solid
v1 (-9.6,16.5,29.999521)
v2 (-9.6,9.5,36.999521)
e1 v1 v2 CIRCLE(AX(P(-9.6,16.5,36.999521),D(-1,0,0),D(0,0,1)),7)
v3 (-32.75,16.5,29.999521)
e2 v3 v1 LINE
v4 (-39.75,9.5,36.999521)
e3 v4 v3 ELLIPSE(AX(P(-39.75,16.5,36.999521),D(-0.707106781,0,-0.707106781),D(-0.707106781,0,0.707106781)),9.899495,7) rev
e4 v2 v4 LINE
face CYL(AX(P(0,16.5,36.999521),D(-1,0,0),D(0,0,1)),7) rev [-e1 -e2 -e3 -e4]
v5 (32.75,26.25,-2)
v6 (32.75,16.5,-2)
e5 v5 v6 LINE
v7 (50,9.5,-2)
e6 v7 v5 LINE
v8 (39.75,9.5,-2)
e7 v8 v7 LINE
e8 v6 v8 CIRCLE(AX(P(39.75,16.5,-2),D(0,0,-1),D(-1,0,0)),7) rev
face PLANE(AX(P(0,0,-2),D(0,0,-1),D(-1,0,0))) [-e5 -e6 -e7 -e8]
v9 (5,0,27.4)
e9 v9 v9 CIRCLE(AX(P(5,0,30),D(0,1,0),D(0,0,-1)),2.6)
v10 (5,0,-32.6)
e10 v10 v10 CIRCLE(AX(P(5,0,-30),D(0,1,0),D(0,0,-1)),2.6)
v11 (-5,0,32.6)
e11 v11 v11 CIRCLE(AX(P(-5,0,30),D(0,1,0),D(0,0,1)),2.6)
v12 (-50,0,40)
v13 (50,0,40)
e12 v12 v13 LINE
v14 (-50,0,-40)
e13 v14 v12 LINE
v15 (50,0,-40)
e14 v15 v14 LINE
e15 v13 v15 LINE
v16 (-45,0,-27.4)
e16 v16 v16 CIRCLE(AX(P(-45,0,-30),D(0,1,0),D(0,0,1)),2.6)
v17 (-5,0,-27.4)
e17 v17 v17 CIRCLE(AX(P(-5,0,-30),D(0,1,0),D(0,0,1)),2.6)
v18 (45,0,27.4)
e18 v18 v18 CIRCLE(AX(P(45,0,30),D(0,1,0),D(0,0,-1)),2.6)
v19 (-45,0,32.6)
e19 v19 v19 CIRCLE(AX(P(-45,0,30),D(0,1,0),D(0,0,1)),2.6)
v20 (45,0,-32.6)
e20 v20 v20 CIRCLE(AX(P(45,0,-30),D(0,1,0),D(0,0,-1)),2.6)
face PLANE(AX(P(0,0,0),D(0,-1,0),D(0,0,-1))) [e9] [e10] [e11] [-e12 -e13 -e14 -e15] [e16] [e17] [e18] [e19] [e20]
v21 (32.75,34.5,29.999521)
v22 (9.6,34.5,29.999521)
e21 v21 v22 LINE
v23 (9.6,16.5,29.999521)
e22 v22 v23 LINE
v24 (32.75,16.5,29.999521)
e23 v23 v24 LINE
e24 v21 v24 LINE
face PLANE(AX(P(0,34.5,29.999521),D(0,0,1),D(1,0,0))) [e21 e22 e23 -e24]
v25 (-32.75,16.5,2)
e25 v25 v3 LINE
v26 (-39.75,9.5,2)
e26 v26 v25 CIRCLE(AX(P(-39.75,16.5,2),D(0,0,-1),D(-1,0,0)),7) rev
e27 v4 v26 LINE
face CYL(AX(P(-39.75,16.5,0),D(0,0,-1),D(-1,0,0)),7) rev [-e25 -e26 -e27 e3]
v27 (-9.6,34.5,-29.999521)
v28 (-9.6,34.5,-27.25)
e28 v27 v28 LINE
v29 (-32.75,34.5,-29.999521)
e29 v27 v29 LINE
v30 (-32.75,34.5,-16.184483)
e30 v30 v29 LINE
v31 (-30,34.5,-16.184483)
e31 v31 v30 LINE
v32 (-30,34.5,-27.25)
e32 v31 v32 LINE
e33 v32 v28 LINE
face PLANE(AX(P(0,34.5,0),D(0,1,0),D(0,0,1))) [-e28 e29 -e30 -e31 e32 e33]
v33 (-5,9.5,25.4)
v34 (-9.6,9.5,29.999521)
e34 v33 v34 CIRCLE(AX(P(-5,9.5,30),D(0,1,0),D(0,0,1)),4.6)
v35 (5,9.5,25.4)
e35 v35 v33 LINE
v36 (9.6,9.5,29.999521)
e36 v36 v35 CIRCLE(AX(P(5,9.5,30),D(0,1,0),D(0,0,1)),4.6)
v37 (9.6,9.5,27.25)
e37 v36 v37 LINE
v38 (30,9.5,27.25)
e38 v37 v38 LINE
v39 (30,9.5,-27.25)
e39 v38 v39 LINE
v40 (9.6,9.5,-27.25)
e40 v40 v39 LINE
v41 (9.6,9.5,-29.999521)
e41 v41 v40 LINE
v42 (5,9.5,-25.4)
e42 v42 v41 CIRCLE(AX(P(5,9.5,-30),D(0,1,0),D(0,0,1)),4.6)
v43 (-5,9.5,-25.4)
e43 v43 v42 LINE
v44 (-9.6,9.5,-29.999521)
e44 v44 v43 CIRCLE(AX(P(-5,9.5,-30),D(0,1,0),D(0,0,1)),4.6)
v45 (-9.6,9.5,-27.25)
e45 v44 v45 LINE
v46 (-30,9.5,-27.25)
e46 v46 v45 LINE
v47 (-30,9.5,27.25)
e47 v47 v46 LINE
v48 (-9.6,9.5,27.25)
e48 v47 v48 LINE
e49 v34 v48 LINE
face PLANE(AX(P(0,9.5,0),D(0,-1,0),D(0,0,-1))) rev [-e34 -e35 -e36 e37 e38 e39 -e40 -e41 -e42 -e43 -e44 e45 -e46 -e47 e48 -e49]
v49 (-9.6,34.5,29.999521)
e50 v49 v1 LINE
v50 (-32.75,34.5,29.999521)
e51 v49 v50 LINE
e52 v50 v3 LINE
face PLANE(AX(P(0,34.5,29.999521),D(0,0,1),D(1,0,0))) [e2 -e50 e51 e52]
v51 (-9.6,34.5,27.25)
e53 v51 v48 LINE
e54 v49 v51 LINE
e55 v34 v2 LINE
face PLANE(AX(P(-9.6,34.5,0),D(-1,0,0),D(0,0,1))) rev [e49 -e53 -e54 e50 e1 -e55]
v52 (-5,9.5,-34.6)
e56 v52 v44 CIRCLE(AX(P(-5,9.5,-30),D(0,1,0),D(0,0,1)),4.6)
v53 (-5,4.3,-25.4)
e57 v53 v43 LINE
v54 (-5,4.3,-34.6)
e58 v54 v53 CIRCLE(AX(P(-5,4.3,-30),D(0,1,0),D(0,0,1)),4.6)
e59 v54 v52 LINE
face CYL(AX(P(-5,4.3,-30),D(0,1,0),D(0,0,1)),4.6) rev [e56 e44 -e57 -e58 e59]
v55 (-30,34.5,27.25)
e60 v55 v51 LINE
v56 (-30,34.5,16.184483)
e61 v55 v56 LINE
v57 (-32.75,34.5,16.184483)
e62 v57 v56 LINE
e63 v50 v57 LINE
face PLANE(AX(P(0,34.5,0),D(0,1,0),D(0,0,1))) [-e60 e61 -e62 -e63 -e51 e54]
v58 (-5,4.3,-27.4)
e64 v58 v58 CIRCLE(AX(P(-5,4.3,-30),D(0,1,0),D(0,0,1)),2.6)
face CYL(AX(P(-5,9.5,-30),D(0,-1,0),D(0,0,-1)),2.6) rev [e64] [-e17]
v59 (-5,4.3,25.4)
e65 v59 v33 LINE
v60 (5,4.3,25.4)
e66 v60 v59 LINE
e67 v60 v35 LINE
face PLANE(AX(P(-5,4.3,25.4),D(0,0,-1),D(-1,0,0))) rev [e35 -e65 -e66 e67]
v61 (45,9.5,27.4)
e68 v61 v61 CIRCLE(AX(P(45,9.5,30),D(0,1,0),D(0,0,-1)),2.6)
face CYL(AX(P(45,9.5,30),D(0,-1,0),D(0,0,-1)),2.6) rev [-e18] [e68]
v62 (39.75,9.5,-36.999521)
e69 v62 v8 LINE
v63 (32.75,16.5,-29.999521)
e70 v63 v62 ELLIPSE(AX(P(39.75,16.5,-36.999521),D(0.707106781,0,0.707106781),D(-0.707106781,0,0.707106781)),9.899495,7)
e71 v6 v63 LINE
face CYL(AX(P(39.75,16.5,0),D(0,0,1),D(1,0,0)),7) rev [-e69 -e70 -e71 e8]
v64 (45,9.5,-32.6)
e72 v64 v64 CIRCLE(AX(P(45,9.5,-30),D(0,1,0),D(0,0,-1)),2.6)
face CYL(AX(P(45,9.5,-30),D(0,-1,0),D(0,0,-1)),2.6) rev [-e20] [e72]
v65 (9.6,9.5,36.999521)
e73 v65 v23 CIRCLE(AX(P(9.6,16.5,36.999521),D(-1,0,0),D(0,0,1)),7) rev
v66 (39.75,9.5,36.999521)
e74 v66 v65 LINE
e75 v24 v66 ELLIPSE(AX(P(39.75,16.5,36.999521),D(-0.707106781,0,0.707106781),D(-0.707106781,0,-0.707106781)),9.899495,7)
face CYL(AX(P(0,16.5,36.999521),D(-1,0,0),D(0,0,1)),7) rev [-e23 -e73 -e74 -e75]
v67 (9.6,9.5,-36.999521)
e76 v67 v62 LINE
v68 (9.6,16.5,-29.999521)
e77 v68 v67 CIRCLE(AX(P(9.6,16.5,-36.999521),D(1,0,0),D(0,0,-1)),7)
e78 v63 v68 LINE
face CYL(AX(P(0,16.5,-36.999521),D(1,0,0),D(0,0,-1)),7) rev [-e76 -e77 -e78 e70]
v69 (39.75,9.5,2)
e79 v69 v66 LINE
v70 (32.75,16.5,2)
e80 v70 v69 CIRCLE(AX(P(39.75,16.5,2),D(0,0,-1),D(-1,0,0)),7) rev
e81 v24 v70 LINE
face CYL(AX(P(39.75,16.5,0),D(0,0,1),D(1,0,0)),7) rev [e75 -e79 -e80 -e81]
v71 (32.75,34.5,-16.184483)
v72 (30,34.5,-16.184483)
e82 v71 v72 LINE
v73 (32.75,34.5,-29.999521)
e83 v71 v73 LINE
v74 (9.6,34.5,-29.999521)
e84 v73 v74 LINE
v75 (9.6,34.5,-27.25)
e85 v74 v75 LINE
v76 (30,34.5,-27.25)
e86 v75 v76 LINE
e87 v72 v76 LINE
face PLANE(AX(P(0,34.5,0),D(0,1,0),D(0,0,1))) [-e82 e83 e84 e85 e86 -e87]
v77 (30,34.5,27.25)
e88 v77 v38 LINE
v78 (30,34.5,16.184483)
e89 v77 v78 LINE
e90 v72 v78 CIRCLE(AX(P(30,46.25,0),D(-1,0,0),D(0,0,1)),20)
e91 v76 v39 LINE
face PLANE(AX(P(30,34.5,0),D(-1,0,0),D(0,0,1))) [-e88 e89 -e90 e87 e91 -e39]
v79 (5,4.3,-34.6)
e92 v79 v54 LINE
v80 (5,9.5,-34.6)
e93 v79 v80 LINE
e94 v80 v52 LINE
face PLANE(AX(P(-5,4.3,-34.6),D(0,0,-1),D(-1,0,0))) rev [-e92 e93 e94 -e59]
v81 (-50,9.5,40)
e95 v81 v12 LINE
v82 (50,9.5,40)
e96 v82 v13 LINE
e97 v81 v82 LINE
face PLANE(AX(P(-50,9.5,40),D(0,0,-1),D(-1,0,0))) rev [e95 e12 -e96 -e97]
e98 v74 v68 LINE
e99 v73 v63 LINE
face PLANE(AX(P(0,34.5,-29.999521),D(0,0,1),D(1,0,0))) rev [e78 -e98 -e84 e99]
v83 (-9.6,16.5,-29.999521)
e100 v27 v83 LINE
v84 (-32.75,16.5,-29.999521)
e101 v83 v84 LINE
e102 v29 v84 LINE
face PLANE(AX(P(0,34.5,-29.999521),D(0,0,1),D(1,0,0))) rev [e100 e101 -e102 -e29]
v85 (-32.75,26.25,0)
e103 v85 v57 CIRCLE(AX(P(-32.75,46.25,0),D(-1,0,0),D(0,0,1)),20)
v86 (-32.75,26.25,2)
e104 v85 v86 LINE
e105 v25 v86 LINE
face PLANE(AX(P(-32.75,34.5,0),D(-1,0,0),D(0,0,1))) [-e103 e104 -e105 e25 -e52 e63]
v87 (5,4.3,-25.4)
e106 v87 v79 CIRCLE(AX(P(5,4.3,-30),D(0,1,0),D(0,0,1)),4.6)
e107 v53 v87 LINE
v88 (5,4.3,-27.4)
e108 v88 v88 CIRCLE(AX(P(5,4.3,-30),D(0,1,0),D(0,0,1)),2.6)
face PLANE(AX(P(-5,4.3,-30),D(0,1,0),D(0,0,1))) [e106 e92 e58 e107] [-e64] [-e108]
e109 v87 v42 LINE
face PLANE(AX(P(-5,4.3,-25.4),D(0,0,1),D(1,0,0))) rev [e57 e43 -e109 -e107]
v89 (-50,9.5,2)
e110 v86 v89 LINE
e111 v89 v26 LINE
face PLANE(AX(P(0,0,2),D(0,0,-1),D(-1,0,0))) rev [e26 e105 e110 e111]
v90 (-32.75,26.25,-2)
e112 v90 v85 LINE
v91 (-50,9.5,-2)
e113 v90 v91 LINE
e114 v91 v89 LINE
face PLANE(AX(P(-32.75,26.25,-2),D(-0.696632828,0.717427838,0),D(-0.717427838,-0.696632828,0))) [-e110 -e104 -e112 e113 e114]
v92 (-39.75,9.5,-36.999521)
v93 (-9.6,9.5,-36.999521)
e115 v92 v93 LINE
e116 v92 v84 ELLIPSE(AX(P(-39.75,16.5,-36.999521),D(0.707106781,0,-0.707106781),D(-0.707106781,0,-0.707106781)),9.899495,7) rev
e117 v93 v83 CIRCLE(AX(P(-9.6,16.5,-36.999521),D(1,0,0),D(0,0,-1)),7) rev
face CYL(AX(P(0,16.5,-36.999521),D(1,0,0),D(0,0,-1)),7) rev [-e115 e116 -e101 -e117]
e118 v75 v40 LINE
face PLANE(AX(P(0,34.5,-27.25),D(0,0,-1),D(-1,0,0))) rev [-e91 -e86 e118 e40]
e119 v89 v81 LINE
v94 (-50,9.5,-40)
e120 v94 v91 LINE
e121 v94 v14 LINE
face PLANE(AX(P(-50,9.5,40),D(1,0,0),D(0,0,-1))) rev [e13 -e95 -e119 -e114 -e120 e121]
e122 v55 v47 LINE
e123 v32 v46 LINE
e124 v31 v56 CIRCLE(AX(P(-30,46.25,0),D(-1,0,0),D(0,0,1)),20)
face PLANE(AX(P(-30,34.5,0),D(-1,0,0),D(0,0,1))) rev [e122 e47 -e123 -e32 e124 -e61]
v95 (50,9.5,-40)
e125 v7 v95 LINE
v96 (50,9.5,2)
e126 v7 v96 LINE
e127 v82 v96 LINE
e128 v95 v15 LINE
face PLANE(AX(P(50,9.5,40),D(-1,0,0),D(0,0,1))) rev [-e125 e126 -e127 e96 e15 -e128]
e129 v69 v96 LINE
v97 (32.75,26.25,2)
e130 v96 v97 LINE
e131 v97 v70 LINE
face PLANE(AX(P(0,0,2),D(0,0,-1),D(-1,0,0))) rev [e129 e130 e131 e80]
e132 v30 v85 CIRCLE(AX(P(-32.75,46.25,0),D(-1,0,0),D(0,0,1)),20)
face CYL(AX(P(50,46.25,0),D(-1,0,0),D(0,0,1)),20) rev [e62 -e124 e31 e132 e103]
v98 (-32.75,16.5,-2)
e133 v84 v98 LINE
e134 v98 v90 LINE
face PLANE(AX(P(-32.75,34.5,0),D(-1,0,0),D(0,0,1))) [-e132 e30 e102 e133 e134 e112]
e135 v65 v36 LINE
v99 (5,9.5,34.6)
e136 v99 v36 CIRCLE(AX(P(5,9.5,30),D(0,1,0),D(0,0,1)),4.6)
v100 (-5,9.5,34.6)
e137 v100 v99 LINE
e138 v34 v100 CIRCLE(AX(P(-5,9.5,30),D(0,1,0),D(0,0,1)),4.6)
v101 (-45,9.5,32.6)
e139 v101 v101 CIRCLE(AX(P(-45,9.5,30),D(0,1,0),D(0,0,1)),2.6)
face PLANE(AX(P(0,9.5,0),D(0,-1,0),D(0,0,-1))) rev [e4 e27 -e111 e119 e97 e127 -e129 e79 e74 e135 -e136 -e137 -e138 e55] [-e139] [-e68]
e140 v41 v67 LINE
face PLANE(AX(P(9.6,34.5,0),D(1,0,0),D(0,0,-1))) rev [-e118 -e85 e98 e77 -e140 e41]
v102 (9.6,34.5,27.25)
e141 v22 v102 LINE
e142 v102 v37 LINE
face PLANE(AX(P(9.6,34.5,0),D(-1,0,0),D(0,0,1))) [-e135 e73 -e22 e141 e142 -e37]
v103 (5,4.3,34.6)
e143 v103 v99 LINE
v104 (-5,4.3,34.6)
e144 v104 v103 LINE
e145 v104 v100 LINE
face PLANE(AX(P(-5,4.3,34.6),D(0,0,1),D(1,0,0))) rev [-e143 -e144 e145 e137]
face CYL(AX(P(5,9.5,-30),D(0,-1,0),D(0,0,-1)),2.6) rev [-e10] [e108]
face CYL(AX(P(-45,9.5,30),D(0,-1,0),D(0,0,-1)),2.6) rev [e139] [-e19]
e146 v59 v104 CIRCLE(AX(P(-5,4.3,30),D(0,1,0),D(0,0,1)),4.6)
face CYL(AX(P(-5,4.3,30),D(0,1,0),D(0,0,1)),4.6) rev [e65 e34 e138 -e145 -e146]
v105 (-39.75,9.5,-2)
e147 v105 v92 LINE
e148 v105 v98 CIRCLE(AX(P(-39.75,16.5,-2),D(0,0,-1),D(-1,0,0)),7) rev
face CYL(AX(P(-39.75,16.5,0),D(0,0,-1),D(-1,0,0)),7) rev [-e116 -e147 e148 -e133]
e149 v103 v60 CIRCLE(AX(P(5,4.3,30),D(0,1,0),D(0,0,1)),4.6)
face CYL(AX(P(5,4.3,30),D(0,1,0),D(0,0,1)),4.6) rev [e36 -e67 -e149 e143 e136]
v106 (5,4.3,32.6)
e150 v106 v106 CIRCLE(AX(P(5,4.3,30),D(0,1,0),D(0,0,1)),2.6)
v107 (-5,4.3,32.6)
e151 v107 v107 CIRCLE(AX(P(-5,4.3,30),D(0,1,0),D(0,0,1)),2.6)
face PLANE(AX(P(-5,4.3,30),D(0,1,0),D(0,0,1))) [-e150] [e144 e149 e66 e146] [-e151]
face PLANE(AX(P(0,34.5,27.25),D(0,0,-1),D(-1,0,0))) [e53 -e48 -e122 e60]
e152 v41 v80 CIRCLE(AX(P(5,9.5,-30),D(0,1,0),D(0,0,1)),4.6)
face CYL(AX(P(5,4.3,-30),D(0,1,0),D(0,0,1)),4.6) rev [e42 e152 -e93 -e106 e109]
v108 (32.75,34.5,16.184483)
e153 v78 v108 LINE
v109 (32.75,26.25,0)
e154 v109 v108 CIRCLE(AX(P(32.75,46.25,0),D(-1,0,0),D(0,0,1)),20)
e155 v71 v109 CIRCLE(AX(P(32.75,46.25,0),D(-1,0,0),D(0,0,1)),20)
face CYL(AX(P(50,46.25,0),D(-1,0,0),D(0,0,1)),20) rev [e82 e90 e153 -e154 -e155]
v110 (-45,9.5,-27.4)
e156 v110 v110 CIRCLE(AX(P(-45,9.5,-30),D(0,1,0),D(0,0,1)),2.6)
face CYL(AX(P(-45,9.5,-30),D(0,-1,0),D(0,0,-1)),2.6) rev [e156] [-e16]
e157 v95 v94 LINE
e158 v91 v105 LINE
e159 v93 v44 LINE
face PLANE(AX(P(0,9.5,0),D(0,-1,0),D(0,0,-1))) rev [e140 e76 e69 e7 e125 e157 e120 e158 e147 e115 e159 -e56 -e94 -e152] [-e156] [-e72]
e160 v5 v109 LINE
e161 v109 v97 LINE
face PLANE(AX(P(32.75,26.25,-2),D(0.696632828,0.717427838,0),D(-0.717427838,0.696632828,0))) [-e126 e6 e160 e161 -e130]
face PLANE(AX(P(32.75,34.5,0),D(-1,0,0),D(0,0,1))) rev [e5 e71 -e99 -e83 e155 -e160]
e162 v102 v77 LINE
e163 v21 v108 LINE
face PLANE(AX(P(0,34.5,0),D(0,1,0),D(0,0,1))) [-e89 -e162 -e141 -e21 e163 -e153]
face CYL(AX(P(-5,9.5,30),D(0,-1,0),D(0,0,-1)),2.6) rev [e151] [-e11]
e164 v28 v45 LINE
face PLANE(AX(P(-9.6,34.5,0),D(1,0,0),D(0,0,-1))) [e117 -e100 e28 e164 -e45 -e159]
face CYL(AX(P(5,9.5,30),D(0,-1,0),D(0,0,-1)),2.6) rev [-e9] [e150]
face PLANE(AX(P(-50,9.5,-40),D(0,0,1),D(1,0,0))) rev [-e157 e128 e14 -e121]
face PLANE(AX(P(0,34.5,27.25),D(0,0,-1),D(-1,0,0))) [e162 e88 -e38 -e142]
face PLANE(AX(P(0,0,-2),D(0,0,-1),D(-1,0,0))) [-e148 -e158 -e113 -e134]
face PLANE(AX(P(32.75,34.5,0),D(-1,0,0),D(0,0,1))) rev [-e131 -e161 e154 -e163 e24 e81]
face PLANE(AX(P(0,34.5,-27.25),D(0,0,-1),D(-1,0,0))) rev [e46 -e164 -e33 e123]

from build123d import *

# Parameters (mm, degrees)
SKETCH_1_W           = 100
SKETCH_1_H           = 80
SKETCH_1_R           = 2.6
EXTRUDE_1_DEPTH      = 9.5
CUT_EXTRUDE_1_DEPTH  = 5.2
EXTRUDE_2_DEPTH      = 25
FILLET_1_R           = 7
SKETCH_7_R           = 20
CUT_EXTRUDE_2_DEPTH  = 99.172361182
EXTRUDE_3_DEPTH      = 2
EXTRUDE_3_DEPTH_BACK = 2


with BuildPart() as part:
    # 草图1 → 凸台-拉伸1 (new body)
    with BuildSketch(Plane(origin=(0, 0, 0), x_dir=(1, 0, 0), z_dir=(0, 1, 0))):
        Rectangle(SKETCH_1_W, SKETCH_1_H)
        with Locations(Location((-45, 30, 0), (0, 0, 270))):
            Circle(SKETCH_1_R, mode=Mode.SUBTRACT)
        with Locations(Location((-5, 30, 0), (0, 0, 270))):
            Circle(SKETCH_1_R, mode=Mode.SUBTRACT)
        with Locations(Location((-5, -30, 0), (0, 0, 270))):
            Circle(SKETCH_1_R, mode=Mode.SUBTRACT)
        with Locations(Location((-45, -30, 0), (0, 0, 270))):
            Circle(SKETCH_1_R, mode=Mode.SUBTRACT)
        with Locations(Location((45, -30, 0), (0, 0, 90))):
            Circle(SKETCH_1_R, mode=Mode.SUBTRACT)
        with Locations(Location((5, -30, 0), (0, 0, 90))):
            Circle(SKETCH_1_R, mode=Mode.SUBTRACT)
        with Locations(Location((5, 30, 0), (0, 0, 90))):
            Circle(SKETCH_1_R, mode=Mode.SUBTRACT)
        with Locations(Location((45, 30, 0), (0, 0, 90))):
            Circle(SKETCH_1_R, mode=Mode.SUBTRACT)
    extrude(amount=EXTRUDE_1_DEPTH)

    # 草图4 → 切除-拉伸1 (cut)
    with BuildSketch(Plane(origin=(0, 9.5, 0), x_dir=(1, 0, 0), z_dir=(0, 1, 0))):
        with BuildLine():
            Line((-5, 34.6), (5, 34.6))
            ThreePointArc((5, 34.6), (9.6, 30), (5, 25.4))
            Line((5, 25.4), (-5, 25.4))
            ThreePointArc((-5, 25.4), (-9.6, 30), (-5, 34.6))
        make_face()
        with BuildLine():
            Line((-5, -25.4), (5, -25.4))
            ThreePointArc((5, -25.4), (9.6, -30), (5, -34.6))
            Line((5, -34.6), (-5, -34.6))
            ThreePointArc((-5, -34.6), (-9.6, -30), (-5, -25.4))
        make_face()
    extrude(amount=-CUT_EXTRUDE_1_DEPTH, mode=Mode.SUBTRACT)

    # 草图5 → 凸台-拉伸2 (add)
    with BuildSketch(Plane(origin=(0, 9.5, 0), x_dir=(1, 0, 0), z_dir=(0, 1, 0))):
        Polygon((-9.6, 27.25), (-9.6, 29.999521433), (-32.75, 29.999521433), (-32.75, -29.999521433), (-9.6, -29.999521433), (-9.6, -27.25), (-30, -27.25), (-30, 27.25), align=None)
        Polygon((32.75, 29.999521433), (9.6, 29.999521433), (9.6, 27.25), (30, 27.25), (30, -27.25), (9.6, -27.25), (9.6, -29.999521433), (32.75, -29.999521433), align=None)
    extrude(amount=EXTRUDE_2_DEPTH)

    # 圆角1
    # the kernel refuses this fillet: 7 mm, written as the material it adds along each edge
    with BuildSketch(Plane(origin=(32.75, 9.5, 29.999521433), x_dir=(1, 0, 0), z_dir=(0, 0, -1)), Plane(origin=(-32.75, 9.5, -29.999521433), x_dir=(-1, 0, 0), z_dir=(0, 0, 1))) as fillet_1_piece_1:
        with BuildLine():
            CenterArc((FILLET_1_R, -FILLET_1_R), FILLET_1_R, 90, 90)
            Line((0, -FILLET_1_R), (-FILLET_1_R * 0.02, -FILLET_1_R))
            Line((-FILLET_1_R * 0.02, -FILLET_1_R), (-FILLET_1_R * 0.02, FILLET_1_R * 0.02))
            Line((-FILLET_1_R * 0.02, FILLET_1_R * 0.02), (FILLET_1_R, FILLET_1_R * 0.02))
            Line((FILLET_1_R, FILLET_1_R * 0.02), (FILLET_1_R, 0))
        make_face()
    extrude(amount=59.999042867)
    with BuildSketch(Plane(origin=(32.75, 9.5, -29.999521433), x_dir=(0, 0, -1), z_dir=(-1, 0, 0)), Plane(origin=(9.6, 9.5, 29.999521433), x_dir=(0, 0, 1), z_dir=(1, 0, 0)), Plane(origin=(-9.6, 9.5, -29.999521433), x_dir=(0, 0, -1), z_dir=(-1, 0, 0)), Plane(origin=(-32.75, 9.5, 29.999521433), x_dir=(0, 0, 1), z_dir=(1, 0, 0))) as fillet_1_piece_2:
        with BuildLine():
            CenterArc((FILLET_1_R, -FILLET_1_R), FILLET_1_R, 90, 90)
            Line((0, -FILLET_1_R), (-FILLET_1_R * 0.02, -FILLET_1_R))
            Line((-FILLET_1_R * 0.02, -FILLET_1_R), (-FILLET_1_R * 0.02, FILLET_1_R * 0.02))
            Line((-FILLET_1_R * 0.02, FILLET_1_R * 0.02), (FILLET_1_R, FILLET_1_R * 0.02))
            Line((FILLET_1_R, FILLET_1_R * 0.02), (FILLET_1_R, 0))
        make_face()
    extrude(amount=23.15)
    with BuildSketch(Plane(origin=(9.6, 9.5, 29.999521433), x_dir=(0, 0, 1), z_dir=(1, 0, 0))) as fillet_1_piece_3a_section:
        with BuildLine():
            CenterArc((FILLET_1_R, -FILLET_1_R), FILLET_1_R, 90, 90)
            Line((0, -FILLET_1_R), (-FILLET_1_R * 0.02, -FILLET_1_R))
            Line((-FILLET_1_R * 0.02, -FILLET_1_R), (-FILLET_1_R * 0.02, FILLET_1_R * 0.02))
            Line((-FILLET_1_R * 0.02, FILLET_1_R * 0.02), (FILLET_1_R, FILLET_1_R * 0.02))
            Line((FILLET_1_R, FILLET_1_R * 0.02), (FILLET_1_R, 0))
        make_face()
    fillet_1_piece_3a = extrude(amount=40.65, mode=Mode.PRIVATE)
    fillet_1_piece_3a = split(fillet_1_piece_3a, bisect_by=Plane(origin=(32.75, 11.0847658, 31.584287233), z_dir=(1, 0, 0)), keep=Keep.TOP, mode=Mode.PRIVATE)
    with BuildSketch(Plane(origin=(32.75, 9.5, 47.499521433), x_dir=(1, 0, 0), z_dir=(0, 0, -1))) as fillet_1_piece_3b_section:
        with BuildLine():
            CenterArc((FILLET_1_R, -FILLET_1_R), FILLET_1_R, 90, 90)
            Line((0, -FILLET_1_R), (-FILLET_1_R * 0.02, -FILLET_1_R))
            Line((-FILLET_1_R * 0.02, -FILLET_1_R), (-FILLET_1_R * 0.02, FILLET_1_R * 0.02))
            Line((-FILLET_1_R * 0.02, FILLET_1_R * 0.02), (FILLET_1_R, FILLET_1_R * 0.02))
            Line((FILLET_1_R, FILLET_1_R * 0.02), (FILLET_1_R, 0))
        make_face()
    fillet_1_piece_3b = extrude(amount=77.499042867, mode=Mode.PRIVATE)
    fillet_1_piece_3b = split(fillet_1_piece_3b, bisect_by=Plane(origin=(34.3347658, 11.0847658, 29.999521433), z_dir=(0, 0, 1)), keep=Keep.TOP, mode=Mode.PRIVATE)
    fillet_1_piece_3 = fillet_1_piece_3a & fillet_1_piece_3b
    add(fillet_1_piece_3)
    with BuildSketch(Plane(origin=(32.75, 9.5, 29.999521433), x_dir=(1, 0, 0), z_dir=(0, 0, -1))) as fillet_1_piece_4a_section:
        with BuildLine():
            CenterArc((FILLET_1_R, -FILLET_1_R), FILLET_1_R, 90, 90)
            Line((0, -FILLET_1_R), (-FILLET_1_R * 0.02, -FILLET_1_R))
            Line((-FILLET_1_R * 0.02, -FILLET_1_R), (-FILLET_1_R * 0.02, FILLET_1_R * 0.02))
            Line((-FILLET_1_R * 0.02, FILLET_1_R * 0.02), (FILLET_1_R, FILLET_1_R * 0.02))
            Line((FILLET_1_R, FILLET_1_R * 0.02), (FILLET_1_R, 0))
        make_face()
    fillet_1_piece_4a = extrude(amount=77.499042867, mode=Mode.PRIVATE)
    fillet_1_piece_4a = split(fillet_1_piece_4a, bisect_by=Plane(origin=(34.3347658, 11.0847658, -29.999521433), z_dir=(0, 0, -1)), keep=Keep.TOP, mode=Mode.PRIVATE)
    with BuildSketch(Plane(origin=(50.25, 9.5, -29.999521433), x_dir=(0, 0, -1), z_dir=(-1, 0, 0))) as fillet_1_piece_4b_section:
        with BuildLine():
            CenterArc((FILLET_1_R, -FILLET_1_R), FILLET_1_R, 90, 90)
            Line((0, -FILLET_1_R), (-FILLET_1_R * 0.02, -FILLET_1_R))
            Line((-FILLET_1_R * 0.02, -FILLET_1_R), (-FILLET_1_R * 0.02, FILLET_1_R * 0.02))
            Line((-FILLET_1_R * 0.02, FILLET_1_R * 0.02), (FILLET_1_R, FILLET_1_R * 0.02))
            Line((FILLET_1_R, FILLET_1_R * 0.02), (FILLET_1_R, 0))
        make_face()
    fillet_1_piece_4b = extrude(amount=40.65, mode=Mode.PRIVATE)
    fillet_1_piece_4b = split(fillet_1_piece_4b, bisect_by=Plane(origin=(32.75, 11.0847658, -31.584287233), z_dir=(1, 0, 0)), keep=Keep.TOP, mode=Mode.PRIVATE)
    fillet_1_piece_4 = fillet_1_piece_4a & fillet_1_piece_4b
    add(fillet_1_piece_4)
    with BuildSketch(Plane(origin=(-9.6, 9.5, -29.999521433), x_dir=(0, 0, -1), z_dir=(-1, 0, 0))) as fillet_1_piece_5a_section:
        with BuildLine():
            CenterArc((FILLET_1_R, -FILLET_1_R), FILLET_1_R, 90, 90)
            Line((0, -FILLET_1_R), (-FILLET_1_R * 0.02, -FILLET_1_R))
            Line((-FILLET_1_R * 0.02, -FILLET_1_R), (-FILLET_1_R * 0.02, FILLET_1_R * 0.02))
            Line((-FILLET_1_R * 0.02, FILLET_1_R * 0.02), (FILLET_1_R, FILLET_1_R * 0.02))
            Line((FILLET_1_R, FILLET_1_R * 0.02), (FILLET_1_R, 0))
        make_face()
    fillet_1_piece_5a = extrude(amount=40.65, mode=Mode.PRIVATE)
    fillet_1_piece_5a = split(fillet_1_piece_5a, bisect_by=Plane(origin=(-32.75, 11.0847658, -31.584287233), z_dir=(-1, 0, 0)), keep=Keep.TOP, mode=Mode.PRIVATE)
    with BuildSketch(Plane(origin=(-32.75, 9.5, -47.499521433), x_dir=(-1, 0, 0), z_dir=(0, 0, 1))) as fillet_1_piece_5b_section:
        with BuildLine():
            CenterArc((FILLET_1_R, -FILLET_1_R), FILLET_1_R, 90, 90)
            Line((0, -FILLET_1_R), (-FILLET_1_R * 0.02, -FILLET_1_R))
            Line((-FILLET_1_R * 0.02, -FILLET_1_R), (-FILLET_1_R * 0.02, FILLET_1_R * 0.02))
            Line((-FILLET_1_R * 0.02, FILLET_1_R * 0.02), (FILLET_1_R, FILLET_1_R * 0.02))
            Line((FILLET_1_R, FILLET_1_R * 0.02), (FILLET_1_R, 0))
        make_face()
    fillet_1_piece_5b = extrude(amount=77.499042867, mode=Mode.PRIVATE)
    fillet_1_piece_5b = split(fillet_1_piece_5b, bisect_by=Plane(origin=(-34.3347658, 11.0847658, -29.999521433), z_dir=(0, 0, -1)), keep=Keep.TOP, mode=Mode.PRIVATE)
    fillet_1_piece_5 = fillet_1_piece_5a & fillet_1_piece_5b
    add(fillet_1_piece_5)
    with BuildSketch(Plane(origin=(-32.75, 9.5, -29.999521433), x_dir=(-1, 0, 0), z_dir=(0, 0, 1))) as fillet_1_piece_6a_section:
        with BuildLine():
            CenterArc((FILLET_1_R, -FILLET_1_R), FILLET_1_R, 90, 90)
            Line((0, -FILLET_1_R), (-FILLET_1_R * 0.02, -FILLET_1_R))
            Line((-FILLET_1_R * 0.02, -FILLET_1_R), (-FILLET_1_R * 0.02, FILLET_1_R * 0.02))
            Line((-FILLET_1_R * 0.02, FILLET_1_R * 0.02), (FILLET_1_R, FILLET_1_R * 0.02))
            Line((FILLET_1_R, FILLET_1_R * 0.02), (FILLET_1_R, 0))
        make_face()
    fillet_1_piece_6a = extrude(amount=77.499042867, mode=Mode.PRIVATE)
    fillet_1_piece_6a = split(fillet_1_piece_6a, bisect_by=Plane(origin=(-34.3347658, 11.0847658, 29.999521433), z_dir=(0, 0, 1)), keep=Keep.TOP, mode=Mode.PRIVATE)
    with BuildSketch(Plane(origin=(-50.25, 9.5, 29.999521433), x_dir=(0, 0, 1), z_dir=(1, 0, 0))) as fillet_1_piece_6b_section:
        with BuildLine():
            CenterArc((FILLET_1_R, -FILLET_1_R), FILLET_1_R, 90, 90)
            Line((0, -FILLET_1_R), (-FILLET_1_R * 0.02, -FILLET_1_R))
            Line((-FILLET_1_R * 0.02, -FILLET_1_R), (-FILLET_1_R * 0.02, FILLET_1_R * 0.02))
            Line((-FILLET_1_R * 0.02, FILLET_1_R * 0.02), (FILLET_1_R, FILLET_1_R * 0.02))
            Line((FILLET_1_R, FILLET_1_R * 0.02), (FILLET_1_R, 0))
        make_face()
    fillet_1_piece_6b = extrude(amount=40.65, mode=Mode.PRIVATE)
    fillet_1_piece_6b = split(fillet_1_piece_6b, bisect_by=Plane(origin=(-32.75, 11.0847658, 31.584287233), z_dir=(-1, 0, 0)), keep=Keep.TOP, mode=Mode.PRIVATE)
    fillet_1_piece_6 = fillet_1_piece_6a & fillet_1_piece_6b
    add(fillet_1_piece_6)

    # 草图7 → 切除-拉伸2 (cut, through all)
    with BuildSketch(Plane.ZY.offset(32.75)):
        with Locations((0, 46.25)):
            Circle(SKETCH_7_R)
    extrude(amount=-CUT_EXTRUDE_2_DEPTH, mode=Mode.SUBTRACT)

    # 草图6 → 凸台-拉伸3 (add, two sides: drawn at the far end of the back side and taken through both)
    with BuildSketch(Plane.XY.offset(-EXTRUDE_3_DEPTH_BACK)):
        Polygon((-32.75, 26.25), (-50, 9.5), (-32.75, 9.5), align=None)
        Polygon((32.75, 9.5), (32.75, 26.25), (50, 9.5), align=None)
    extrude(amount=EXTRUDE_3_DEPTH + EXTRUDE_3_DEPTH_BACK)


solid = part.part
